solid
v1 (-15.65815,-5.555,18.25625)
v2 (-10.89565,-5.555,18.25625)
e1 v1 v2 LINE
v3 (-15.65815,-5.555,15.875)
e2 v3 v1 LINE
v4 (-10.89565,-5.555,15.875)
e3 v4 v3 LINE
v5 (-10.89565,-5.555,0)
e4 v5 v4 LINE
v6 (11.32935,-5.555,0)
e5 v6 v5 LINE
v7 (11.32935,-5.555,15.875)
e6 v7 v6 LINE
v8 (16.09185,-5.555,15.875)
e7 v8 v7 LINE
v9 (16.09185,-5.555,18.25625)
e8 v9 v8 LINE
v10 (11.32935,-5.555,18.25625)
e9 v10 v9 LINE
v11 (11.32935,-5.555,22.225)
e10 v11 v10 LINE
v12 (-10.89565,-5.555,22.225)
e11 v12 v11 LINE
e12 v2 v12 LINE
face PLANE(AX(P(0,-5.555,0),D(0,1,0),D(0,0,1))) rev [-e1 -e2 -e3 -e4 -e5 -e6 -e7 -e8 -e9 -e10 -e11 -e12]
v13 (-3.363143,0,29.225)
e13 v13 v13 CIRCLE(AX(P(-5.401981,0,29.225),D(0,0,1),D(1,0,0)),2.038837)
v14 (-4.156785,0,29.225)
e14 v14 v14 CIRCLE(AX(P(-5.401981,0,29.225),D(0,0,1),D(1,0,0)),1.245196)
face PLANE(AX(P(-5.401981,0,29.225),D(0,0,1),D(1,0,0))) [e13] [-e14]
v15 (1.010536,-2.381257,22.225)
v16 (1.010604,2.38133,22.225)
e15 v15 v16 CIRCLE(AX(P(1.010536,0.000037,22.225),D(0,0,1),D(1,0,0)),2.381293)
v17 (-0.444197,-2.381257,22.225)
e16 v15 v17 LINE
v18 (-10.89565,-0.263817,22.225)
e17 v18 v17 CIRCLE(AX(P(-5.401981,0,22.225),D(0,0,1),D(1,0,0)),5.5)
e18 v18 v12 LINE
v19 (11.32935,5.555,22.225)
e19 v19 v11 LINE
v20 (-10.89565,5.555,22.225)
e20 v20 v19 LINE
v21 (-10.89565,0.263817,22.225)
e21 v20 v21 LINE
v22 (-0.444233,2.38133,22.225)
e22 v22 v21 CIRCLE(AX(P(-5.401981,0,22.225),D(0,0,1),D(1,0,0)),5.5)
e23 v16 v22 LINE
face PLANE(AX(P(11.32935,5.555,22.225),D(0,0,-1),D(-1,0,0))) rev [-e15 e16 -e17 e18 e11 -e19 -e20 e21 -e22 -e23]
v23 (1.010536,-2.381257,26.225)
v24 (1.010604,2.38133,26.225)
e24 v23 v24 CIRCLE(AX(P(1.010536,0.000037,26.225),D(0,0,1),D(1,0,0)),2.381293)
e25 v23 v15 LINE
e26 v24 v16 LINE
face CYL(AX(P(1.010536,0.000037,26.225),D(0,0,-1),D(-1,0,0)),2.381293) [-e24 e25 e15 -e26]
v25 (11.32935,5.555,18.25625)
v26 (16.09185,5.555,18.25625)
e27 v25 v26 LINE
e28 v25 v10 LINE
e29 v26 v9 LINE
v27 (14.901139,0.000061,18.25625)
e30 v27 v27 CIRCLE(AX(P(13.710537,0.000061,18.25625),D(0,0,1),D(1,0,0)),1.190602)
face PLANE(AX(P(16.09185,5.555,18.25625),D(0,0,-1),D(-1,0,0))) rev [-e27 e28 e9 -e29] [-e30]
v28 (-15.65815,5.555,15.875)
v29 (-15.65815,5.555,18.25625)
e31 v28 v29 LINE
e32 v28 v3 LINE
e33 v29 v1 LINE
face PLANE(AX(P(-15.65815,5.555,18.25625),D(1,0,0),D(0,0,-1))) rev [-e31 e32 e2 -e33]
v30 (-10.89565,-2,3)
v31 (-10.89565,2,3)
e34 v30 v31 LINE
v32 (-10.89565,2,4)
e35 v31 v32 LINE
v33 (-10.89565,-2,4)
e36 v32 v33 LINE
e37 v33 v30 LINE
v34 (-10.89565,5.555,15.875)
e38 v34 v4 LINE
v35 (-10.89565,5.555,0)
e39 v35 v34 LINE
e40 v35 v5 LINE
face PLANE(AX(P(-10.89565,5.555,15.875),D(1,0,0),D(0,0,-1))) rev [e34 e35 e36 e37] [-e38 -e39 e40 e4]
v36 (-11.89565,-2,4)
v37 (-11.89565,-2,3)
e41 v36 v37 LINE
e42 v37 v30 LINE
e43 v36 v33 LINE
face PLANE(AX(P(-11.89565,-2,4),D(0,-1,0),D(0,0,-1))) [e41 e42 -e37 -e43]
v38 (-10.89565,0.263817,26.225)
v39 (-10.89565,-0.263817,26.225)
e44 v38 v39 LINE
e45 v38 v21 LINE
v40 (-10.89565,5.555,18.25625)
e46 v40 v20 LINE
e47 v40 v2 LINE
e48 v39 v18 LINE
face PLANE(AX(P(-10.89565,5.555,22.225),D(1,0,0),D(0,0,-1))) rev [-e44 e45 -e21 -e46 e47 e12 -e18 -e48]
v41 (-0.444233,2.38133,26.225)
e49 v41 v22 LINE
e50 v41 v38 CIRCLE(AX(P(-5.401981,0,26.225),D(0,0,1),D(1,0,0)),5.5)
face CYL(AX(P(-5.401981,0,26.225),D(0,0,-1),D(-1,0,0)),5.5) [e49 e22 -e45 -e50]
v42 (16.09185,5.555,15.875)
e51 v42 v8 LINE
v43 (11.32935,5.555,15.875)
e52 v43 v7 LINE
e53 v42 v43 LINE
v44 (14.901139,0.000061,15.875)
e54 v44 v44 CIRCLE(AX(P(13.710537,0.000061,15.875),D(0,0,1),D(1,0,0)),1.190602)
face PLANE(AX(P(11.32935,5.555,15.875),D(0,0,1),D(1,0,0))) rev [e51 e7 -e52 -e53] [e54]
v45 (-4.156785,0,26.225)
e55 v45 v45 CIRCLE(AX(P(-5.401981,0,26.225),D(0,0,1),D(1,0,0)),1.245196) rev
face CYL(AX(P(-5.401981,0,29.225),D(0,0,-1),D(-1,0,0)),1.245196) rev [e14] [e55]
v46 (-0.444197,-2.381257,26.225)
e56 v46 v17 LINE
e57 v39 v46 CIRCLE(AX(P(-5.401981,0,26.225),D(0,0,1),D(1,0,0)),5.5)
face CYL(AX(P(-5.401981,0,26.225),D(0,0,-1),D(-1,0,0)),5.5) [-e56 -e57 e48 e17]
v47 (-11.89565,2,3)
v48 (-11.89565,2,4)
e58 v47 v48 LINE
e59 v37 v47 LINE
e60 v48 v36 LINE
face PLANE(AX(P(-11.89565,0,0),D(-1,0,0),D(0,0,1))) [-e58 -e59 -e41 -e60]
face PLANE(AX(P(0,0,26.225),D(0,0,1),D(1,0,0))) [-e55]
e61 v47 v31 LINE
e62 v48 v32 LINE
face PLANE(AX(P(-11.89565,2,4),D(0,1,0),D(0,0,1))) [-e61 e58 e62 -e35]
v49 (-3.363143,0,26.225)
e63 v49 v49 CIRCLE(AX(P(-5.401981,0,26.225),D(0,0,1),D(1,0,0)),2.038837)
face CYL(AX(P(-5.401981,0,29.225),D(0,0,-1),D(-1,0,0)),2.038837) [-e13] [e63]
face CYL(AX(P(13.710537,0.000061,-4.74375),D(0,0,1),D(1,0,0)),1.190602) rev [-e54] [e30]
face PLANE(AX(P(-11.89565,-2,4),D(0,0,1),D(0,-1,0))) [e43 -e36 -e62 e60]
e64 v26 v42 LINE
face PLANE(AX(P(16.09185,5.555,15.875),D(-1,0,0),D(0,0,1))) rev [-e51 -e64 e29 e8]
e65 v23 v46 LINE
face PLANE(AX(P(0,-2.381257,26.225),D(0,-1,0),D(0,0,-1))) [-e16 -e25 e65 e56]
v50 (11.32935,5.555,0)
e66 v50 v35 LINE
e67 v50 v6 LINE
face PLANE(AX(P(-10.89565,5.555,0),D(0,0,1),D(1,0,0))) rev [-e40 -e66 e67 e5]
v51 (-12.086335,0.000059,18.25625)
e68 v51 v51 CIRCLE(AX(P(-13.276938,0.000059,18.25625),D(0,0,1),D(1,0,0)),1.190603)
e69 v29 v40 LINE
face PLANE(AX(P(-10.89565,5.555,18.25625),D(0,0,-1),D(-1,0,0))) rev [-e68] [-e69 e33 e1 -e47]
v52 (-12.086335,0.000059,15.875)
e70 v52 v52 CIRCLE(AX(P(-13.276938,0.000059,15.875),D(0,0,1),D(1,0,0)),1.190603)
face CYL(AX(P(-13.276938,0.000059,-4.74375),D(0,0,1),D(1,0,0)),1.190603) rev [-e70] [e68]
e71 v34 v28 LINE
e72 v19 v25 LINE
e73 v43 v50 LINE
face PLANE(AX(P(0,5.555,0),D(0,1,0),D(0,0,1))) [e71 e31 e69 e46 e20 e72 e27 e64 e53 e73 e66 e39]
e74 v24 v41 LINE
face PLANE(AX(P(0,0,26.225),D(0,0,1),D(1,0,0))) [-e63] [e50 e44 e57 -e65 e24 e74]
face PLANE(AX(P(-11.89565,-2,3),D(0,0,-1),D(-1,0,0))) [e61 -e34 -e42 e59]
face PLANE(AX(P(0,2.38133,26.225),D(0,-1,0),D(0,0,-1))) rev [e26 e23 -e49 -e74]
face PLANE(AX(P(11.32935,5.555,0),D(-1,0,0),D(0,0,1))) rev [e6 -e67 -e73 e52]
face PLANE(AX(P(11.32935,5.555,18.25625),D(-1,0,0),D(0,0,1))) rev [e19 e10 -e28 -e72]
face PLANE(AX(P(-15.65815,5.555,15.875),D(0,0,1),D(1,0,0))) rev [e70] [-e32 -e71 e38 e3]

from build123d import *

# Parameters (mm, degrees)
P_IDAT_VYSUNUT_M1_DEPTH  = 5.555
P_IDAT_VYSUNUT_M2_DEPTH  = 4
SKICA3_R                 = 2.03883748
SKICA3_R_2               = 1.24519559
P_IDAT_VYSUNUT_M3_DEPTH  = 3
SKICA5_R                 = 1.190602913
SKICA5_R_2               = 1.19060243
ODEBRAT_VYSUNUT_M1_DEPTH = 23
SKICA7_W                 = 1
SKICA7_H                 = 4
P_IDAT_VYSUNUT_M4_DEPTH  = 1


# Read off the part's stored shape, not the designer's step: Přidat vysunutím2
with BuildPart() as part:
    # Skica1 → Přidat vysunutím1 (new, symmetric)
    with BuildSketch(Plane(origin=(0, 0, 0), x_dir=(1, 0, 0), z_dir=(0, 1, 0))):
        Polygon((11.32935, -15.875), (16.09185, -15.875), (16.09185, -18.25625), (11.32935, -18.25625), (11.32935, -22.225), (-10.89565, -22.225), (-10.89565, -18.25625), (-15.65815, -18.25625), (-15.65815, -15.875), (-10.89565, -15.875), (-10.89565, 0), (11.32935, 0), align=None)
    extrude(amount=P_IDAT_VYSUNUT_M1_DEPTH, both=True)

    # Přidat vysunutím2 outline → Přidat vysunutím2 (add)
    with BuildSketch(Plane.XY.offset(22.225)):
        with BuildLine():
            Line((-10.89565, 0.263816958), (-10.89565, -0.263816958))
            ThreePointArc((-10.89565, -0.263816958), (-6.494080203, -5.390484118), (-0.444197365, -2.381256561))
            Line((-0.444197365, -2.381256561), (1.010536018, -2.381256561))
            ThreePointArc((1.010536018, -2.381256561), (3.391829299, 2.729e-06), (1.010604, 2.38133))
            Line((1.010604, 2.38133), (-0.444232639, 2.38133))
            ThreePointArc((-0.444232639, 2.38133), (-6.494120128, 5.390476029), (-10.89565, 0.263816958))
        make_face()
    extrude(amount=P_IDAT_VYSUNUT_M2_DEPTH)

    # Skica3 → Přidat vysunutím3 (add)
    with BuildSketch(Plane.XY.offset(26.225)):
        with Locations((-5.401980861, 0)):
            Circle(SKICA3_R)
        with Locations((-5.401980861, 0)):
            Circle(SKICA3_R_2, mode=Mode.SUBTRACT)
    extrude(amount=P_IDAT_VYSUNUT_M3_DEPTH)

    # Skica5 → Odebrat vysunutím1 (cut)
    with BuildSketch(Plane.XY.offset(18.25625)):
        with Locations((-13.276937552, 5.8558e-05)):
            Circle(SKICA5_R)
        with Locations((13.71053658, 6.1415e-05)):
            Circle(SKICA5_R_2)
    extrude(amount=-ODEBRAT_VYSUNUT_M1_DEPTH, mode=Mode.SUBTRACT)

    # Skica7 → Přidat vysunutím4 (add)
    with BuildSketch(Plane(origin=(-10.89565, 0, 10.89565), x_dir=(0, 0, -1), z_dir=(1, 0, 0))):
        with Locations((7.39565, 0)):
            Rectangle(SKICA7_W, SKICA7_H)
    extrude(amount=-P_IDAT_VYSUNUT_M4_DEPTH)


solid = part.part
